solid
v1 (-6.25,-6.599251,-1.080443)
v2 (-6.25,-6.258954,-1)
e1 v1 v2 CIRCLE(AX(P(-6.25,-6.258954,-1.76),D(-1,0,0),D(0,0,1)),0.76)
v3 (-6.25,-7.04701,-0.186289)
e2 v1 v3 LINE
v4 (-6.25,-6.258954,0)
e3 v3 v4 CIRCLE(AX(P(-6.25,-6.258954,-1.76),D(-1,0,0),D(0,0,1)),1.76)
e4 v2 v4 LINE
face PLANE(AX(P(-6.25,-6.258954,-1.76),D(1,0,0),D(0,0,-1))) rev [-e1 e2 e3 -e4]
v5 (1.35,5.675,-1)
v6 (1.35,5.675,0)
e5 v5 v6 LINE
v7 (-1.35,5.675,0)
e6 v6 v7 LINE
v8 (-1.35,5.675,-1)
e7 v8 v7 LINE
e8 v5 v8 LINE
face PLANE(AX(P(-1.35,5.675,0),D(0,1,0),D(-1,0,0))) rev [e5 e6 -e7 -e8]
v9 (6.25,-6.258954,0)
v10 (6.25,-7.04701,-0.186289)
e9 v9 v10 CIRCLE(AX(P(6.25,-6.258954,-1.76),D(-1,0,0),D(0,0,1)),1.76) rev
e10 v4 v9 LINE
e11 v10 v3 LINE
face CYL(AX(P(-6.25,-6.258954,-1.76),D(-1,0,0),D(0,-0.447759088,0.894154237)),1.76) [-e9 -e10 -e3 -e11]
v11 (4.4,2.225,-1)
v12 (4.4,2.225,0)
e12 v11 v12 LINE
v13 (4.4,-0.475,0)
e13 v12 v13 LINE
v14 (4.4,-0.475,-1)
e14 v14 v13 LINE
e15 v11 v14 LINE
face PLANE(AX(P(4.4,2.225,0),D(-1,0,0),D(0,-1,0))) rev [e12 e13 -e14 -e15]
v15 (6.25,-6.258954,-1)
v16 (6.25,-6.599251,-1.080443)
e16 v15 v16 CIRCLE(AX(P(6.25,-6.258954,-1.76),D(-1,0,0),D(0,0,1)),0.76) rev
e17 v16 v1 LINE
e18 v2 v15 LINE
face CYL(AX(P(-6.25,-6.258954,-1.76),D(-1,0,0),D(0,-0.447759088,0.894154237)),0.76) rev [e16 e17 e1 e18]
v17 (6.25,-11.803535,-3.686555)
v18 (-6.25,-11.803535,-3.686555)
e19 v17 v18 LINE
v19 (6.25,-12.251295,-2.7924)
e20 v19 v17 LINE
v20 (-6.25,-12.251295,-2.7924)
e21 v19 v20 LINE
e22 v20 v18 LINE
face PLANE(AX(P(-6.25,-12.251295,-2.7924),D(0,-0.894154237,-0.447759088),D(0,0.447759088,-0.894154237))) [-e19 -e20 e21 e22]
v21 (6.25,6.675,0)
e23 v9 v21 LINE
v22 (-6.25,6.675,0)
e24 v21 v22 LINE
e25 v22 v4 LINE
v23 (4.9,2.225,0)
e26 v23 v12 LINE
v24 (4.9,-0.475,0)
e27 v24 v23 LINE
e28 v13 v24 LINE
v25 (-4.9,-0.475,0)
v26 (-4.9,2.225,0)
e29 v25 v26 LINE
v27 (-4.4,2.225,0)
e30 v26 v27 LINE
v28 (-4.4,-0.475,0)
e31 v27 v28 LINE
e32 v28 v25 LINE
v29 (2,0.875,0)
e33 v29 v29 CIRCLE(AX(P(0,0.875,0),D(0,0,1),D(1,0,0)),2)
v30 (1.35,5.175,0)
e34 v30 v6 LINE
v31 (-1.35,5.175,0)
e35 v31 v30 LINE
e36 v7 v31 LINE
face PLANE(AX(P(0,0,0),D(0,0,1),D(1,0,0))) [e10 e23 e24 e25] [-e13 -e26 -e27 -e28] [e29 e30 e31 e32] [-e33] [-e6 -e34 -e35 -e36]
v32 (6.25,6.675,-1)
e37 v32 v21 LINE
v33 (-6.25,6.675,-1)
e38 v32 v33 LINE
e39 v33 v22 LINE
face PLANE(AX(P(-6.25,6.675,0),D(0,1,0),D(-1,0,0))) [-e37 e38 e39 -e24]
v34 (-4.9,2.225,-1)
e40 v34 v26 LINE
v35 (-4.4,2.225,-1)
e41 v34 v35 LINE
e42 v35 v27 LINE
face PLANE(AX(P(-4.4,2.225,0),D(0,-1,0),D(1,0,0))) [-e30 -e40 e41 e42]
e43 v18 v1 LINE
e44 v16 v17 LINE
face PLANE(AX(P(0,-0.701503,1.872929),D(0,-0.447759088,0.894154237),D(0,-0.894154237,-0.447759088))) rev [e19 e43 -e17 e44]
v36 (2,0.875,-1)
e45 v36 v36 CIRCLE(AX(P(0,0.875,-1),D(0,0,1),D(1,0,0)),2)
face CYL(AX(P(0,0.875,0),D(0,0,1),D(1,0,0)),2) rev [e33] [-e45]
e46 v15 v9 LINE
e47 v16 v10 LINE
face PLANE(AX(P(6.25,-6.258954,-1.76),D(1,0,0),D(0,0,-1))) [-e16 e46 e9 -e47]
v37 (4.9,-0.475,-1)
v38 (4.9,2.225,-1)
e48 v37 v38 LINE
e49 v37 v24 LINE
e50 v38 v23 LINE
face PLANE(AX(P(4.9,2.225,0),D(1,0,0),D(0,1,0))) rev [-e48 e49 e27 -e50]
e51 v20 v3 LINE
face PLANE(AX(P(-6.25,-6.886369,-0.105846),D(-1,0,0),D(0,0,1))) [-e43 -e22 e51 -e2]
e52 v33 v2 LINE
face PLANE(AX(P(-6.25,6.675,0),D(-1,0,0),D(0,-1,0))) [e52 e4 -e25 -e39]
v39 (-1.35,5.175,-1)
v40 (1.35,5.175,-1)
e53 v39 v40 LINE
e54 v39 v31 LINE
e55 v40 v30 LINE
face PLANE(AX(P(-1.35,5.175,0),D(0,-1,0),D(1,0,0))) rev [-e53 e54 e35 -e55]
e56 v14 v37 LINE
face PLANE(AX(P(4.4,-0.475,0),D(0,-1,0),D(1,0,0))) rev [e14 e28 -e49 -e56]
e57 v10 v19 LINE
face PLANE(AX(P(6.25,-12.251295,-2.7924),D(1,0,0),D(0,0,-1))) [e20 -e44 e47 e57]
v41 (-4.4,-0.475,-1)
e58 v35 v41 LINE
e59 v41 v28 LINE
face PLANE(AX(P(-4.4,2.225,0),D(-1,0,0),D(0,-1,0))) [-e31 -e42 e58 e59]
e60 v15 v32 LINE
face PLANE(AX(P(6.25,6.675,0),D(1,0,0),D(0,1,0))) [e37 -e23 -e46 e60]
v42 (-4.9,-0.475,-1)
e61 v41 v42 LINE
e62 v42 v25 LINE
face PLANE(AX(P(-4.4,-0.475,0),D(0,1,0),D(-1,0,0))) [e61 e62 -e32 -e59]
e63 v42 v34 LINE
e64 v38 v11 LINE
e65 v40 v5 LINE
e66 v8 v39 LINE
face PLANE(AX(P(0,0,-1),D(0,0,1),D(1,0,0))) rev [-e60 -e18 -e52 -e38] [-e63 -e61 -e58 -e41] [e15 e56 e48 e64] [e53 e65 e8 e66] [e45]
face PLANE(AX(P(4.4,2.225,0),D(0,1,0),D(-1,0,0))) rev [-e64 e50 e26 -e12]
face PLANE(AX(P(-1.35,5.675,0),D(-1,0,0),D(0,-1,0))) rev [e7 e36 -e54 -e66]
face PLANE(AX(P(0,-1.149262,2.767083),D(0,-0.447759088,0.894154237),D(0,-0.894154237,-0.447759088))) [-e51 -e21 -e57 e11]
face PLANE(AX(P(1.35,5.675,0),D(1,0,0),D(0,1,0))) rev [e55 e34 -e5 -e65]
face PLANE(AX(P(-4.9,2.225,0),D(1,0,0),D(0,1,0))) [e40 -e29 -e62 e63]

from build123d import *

# Parameters (mm, degrees)
BASES_W              = 12.5
BASES_H              = 13.35
BASE_DEPTH           = 1
SCREWACCESSS_R       = 2
SCREW_ACCESS_DEPTH   = 10.198811064
NEUTRALS_W           = 0.5
NEUTRALS_H           = 2.7
NEUTRAL_DEPTH        = 1.6
GROUNDS_W            = 2.7
GROUNDS_H            = 0.5
GROUND_DEPTH         = 1.6
EDGE_FLANGE1_START   = -6.25
EDGE_FLANGE1_DEPTH   = 12.5
EDGE_FLANGE1_2_DEPTH = 12.5


# Read off the part's stored shape, not the designer's step: Edge-Flange1
with BuildPart() as part:
    # BaseS → BASE (new body)
    with BuildSketch(Plane.XY):
        Rectangle(BASES_W, BASES_H)
    extrude(amount=-BASE_DEPTH)

    # ScrewAccessS → SCREW ACCESS (cut, through all)
    with BuildSketch(Plane.XY):
        with Locations((0, 0.875)):
            Circle(SCREWACCESSS_R)
    extrude(amount=-SCREW_ACCESS_DEPTH, mode=Mode.SUBTRACT)

    # NeutralS → NEUTRAL (cut)
    with BuildSketch(Plane.XY):
        with Locations((4.65, 0.875)):
            Rectangle(NEUTRALS_W, NEUTRALS_H)
    neutral = extrude(amount=-NEUTRAL_DEPTH, mode=Mode.SUBTRACT)

    # LINE HM: NEUTRAL across plane
    add(neutral.mirror(Plane(origin=(0, 0, 0), x_dir=(0, 0, 1), z_dir=(1, 0, 0))), mode=Mode.SUBTRACT)

    # GroundS → GROUND (cut)
    with BuildSketch(Plane.XY):
        with Locations((0, 5.425)):
            Rectangle(GROUNDS_W, GROUNDS_H)
    extrude(amount=-GROUND_DEPTH, mode=Mode.SUBTRACT)

    # Edge-Flange1 outline → Edge-Flange1 (cut)
    with BuildSketch(Plane.YZ.offset(EDGE_FLANGE1_START)):
        with BuildLine():
            Line((-6.675, 0), (-6.675, -0.049881461))
            ThreePointArc((-6.675, -0.049881461), (-6.468466602, -0.01251486), (-6.25895363, 0))
            Line((-6.25895363, 0), (-6.675, 0))
        make_face()
    extrude(amount=EDGE_FLANGE1_DEPTH, mode=Mode.SUBTRACT)

    # Edge-Flange1 2 outline → Edge-Flange1 2 (add)
    with BuildSketch(Plane.YZ.offset(EDGE_FLANGE1_START)):
        with BuildLine():
            ThreePointArc((-6.675, -0.049881461), (-6.864855726, -0.107582786), (-7.047009625, -0.186288543))
            Line((-7.047009625, -0.186288543), (-12.251294526, -2.79240029))
            Line((-12.251294526, -2.79240029), (-11.803535438, -3.686554527))
            Line((-11.803535438, -3.686554527), (-6.599250537, -1.08044278))
            ThreePointArc((-6.599250537, -1.08044278), (-6.43379143, -1.020384057), (-6.25895363, -1))
            Line((-6.25895363, -1), (-6.675, -1))
            Line((-6.675, -1), (-6.675, -0.049881461))
        make_face()
    extrude(amount=EDGE_FLANGE1_2_DEPTH)


solid = part.part
